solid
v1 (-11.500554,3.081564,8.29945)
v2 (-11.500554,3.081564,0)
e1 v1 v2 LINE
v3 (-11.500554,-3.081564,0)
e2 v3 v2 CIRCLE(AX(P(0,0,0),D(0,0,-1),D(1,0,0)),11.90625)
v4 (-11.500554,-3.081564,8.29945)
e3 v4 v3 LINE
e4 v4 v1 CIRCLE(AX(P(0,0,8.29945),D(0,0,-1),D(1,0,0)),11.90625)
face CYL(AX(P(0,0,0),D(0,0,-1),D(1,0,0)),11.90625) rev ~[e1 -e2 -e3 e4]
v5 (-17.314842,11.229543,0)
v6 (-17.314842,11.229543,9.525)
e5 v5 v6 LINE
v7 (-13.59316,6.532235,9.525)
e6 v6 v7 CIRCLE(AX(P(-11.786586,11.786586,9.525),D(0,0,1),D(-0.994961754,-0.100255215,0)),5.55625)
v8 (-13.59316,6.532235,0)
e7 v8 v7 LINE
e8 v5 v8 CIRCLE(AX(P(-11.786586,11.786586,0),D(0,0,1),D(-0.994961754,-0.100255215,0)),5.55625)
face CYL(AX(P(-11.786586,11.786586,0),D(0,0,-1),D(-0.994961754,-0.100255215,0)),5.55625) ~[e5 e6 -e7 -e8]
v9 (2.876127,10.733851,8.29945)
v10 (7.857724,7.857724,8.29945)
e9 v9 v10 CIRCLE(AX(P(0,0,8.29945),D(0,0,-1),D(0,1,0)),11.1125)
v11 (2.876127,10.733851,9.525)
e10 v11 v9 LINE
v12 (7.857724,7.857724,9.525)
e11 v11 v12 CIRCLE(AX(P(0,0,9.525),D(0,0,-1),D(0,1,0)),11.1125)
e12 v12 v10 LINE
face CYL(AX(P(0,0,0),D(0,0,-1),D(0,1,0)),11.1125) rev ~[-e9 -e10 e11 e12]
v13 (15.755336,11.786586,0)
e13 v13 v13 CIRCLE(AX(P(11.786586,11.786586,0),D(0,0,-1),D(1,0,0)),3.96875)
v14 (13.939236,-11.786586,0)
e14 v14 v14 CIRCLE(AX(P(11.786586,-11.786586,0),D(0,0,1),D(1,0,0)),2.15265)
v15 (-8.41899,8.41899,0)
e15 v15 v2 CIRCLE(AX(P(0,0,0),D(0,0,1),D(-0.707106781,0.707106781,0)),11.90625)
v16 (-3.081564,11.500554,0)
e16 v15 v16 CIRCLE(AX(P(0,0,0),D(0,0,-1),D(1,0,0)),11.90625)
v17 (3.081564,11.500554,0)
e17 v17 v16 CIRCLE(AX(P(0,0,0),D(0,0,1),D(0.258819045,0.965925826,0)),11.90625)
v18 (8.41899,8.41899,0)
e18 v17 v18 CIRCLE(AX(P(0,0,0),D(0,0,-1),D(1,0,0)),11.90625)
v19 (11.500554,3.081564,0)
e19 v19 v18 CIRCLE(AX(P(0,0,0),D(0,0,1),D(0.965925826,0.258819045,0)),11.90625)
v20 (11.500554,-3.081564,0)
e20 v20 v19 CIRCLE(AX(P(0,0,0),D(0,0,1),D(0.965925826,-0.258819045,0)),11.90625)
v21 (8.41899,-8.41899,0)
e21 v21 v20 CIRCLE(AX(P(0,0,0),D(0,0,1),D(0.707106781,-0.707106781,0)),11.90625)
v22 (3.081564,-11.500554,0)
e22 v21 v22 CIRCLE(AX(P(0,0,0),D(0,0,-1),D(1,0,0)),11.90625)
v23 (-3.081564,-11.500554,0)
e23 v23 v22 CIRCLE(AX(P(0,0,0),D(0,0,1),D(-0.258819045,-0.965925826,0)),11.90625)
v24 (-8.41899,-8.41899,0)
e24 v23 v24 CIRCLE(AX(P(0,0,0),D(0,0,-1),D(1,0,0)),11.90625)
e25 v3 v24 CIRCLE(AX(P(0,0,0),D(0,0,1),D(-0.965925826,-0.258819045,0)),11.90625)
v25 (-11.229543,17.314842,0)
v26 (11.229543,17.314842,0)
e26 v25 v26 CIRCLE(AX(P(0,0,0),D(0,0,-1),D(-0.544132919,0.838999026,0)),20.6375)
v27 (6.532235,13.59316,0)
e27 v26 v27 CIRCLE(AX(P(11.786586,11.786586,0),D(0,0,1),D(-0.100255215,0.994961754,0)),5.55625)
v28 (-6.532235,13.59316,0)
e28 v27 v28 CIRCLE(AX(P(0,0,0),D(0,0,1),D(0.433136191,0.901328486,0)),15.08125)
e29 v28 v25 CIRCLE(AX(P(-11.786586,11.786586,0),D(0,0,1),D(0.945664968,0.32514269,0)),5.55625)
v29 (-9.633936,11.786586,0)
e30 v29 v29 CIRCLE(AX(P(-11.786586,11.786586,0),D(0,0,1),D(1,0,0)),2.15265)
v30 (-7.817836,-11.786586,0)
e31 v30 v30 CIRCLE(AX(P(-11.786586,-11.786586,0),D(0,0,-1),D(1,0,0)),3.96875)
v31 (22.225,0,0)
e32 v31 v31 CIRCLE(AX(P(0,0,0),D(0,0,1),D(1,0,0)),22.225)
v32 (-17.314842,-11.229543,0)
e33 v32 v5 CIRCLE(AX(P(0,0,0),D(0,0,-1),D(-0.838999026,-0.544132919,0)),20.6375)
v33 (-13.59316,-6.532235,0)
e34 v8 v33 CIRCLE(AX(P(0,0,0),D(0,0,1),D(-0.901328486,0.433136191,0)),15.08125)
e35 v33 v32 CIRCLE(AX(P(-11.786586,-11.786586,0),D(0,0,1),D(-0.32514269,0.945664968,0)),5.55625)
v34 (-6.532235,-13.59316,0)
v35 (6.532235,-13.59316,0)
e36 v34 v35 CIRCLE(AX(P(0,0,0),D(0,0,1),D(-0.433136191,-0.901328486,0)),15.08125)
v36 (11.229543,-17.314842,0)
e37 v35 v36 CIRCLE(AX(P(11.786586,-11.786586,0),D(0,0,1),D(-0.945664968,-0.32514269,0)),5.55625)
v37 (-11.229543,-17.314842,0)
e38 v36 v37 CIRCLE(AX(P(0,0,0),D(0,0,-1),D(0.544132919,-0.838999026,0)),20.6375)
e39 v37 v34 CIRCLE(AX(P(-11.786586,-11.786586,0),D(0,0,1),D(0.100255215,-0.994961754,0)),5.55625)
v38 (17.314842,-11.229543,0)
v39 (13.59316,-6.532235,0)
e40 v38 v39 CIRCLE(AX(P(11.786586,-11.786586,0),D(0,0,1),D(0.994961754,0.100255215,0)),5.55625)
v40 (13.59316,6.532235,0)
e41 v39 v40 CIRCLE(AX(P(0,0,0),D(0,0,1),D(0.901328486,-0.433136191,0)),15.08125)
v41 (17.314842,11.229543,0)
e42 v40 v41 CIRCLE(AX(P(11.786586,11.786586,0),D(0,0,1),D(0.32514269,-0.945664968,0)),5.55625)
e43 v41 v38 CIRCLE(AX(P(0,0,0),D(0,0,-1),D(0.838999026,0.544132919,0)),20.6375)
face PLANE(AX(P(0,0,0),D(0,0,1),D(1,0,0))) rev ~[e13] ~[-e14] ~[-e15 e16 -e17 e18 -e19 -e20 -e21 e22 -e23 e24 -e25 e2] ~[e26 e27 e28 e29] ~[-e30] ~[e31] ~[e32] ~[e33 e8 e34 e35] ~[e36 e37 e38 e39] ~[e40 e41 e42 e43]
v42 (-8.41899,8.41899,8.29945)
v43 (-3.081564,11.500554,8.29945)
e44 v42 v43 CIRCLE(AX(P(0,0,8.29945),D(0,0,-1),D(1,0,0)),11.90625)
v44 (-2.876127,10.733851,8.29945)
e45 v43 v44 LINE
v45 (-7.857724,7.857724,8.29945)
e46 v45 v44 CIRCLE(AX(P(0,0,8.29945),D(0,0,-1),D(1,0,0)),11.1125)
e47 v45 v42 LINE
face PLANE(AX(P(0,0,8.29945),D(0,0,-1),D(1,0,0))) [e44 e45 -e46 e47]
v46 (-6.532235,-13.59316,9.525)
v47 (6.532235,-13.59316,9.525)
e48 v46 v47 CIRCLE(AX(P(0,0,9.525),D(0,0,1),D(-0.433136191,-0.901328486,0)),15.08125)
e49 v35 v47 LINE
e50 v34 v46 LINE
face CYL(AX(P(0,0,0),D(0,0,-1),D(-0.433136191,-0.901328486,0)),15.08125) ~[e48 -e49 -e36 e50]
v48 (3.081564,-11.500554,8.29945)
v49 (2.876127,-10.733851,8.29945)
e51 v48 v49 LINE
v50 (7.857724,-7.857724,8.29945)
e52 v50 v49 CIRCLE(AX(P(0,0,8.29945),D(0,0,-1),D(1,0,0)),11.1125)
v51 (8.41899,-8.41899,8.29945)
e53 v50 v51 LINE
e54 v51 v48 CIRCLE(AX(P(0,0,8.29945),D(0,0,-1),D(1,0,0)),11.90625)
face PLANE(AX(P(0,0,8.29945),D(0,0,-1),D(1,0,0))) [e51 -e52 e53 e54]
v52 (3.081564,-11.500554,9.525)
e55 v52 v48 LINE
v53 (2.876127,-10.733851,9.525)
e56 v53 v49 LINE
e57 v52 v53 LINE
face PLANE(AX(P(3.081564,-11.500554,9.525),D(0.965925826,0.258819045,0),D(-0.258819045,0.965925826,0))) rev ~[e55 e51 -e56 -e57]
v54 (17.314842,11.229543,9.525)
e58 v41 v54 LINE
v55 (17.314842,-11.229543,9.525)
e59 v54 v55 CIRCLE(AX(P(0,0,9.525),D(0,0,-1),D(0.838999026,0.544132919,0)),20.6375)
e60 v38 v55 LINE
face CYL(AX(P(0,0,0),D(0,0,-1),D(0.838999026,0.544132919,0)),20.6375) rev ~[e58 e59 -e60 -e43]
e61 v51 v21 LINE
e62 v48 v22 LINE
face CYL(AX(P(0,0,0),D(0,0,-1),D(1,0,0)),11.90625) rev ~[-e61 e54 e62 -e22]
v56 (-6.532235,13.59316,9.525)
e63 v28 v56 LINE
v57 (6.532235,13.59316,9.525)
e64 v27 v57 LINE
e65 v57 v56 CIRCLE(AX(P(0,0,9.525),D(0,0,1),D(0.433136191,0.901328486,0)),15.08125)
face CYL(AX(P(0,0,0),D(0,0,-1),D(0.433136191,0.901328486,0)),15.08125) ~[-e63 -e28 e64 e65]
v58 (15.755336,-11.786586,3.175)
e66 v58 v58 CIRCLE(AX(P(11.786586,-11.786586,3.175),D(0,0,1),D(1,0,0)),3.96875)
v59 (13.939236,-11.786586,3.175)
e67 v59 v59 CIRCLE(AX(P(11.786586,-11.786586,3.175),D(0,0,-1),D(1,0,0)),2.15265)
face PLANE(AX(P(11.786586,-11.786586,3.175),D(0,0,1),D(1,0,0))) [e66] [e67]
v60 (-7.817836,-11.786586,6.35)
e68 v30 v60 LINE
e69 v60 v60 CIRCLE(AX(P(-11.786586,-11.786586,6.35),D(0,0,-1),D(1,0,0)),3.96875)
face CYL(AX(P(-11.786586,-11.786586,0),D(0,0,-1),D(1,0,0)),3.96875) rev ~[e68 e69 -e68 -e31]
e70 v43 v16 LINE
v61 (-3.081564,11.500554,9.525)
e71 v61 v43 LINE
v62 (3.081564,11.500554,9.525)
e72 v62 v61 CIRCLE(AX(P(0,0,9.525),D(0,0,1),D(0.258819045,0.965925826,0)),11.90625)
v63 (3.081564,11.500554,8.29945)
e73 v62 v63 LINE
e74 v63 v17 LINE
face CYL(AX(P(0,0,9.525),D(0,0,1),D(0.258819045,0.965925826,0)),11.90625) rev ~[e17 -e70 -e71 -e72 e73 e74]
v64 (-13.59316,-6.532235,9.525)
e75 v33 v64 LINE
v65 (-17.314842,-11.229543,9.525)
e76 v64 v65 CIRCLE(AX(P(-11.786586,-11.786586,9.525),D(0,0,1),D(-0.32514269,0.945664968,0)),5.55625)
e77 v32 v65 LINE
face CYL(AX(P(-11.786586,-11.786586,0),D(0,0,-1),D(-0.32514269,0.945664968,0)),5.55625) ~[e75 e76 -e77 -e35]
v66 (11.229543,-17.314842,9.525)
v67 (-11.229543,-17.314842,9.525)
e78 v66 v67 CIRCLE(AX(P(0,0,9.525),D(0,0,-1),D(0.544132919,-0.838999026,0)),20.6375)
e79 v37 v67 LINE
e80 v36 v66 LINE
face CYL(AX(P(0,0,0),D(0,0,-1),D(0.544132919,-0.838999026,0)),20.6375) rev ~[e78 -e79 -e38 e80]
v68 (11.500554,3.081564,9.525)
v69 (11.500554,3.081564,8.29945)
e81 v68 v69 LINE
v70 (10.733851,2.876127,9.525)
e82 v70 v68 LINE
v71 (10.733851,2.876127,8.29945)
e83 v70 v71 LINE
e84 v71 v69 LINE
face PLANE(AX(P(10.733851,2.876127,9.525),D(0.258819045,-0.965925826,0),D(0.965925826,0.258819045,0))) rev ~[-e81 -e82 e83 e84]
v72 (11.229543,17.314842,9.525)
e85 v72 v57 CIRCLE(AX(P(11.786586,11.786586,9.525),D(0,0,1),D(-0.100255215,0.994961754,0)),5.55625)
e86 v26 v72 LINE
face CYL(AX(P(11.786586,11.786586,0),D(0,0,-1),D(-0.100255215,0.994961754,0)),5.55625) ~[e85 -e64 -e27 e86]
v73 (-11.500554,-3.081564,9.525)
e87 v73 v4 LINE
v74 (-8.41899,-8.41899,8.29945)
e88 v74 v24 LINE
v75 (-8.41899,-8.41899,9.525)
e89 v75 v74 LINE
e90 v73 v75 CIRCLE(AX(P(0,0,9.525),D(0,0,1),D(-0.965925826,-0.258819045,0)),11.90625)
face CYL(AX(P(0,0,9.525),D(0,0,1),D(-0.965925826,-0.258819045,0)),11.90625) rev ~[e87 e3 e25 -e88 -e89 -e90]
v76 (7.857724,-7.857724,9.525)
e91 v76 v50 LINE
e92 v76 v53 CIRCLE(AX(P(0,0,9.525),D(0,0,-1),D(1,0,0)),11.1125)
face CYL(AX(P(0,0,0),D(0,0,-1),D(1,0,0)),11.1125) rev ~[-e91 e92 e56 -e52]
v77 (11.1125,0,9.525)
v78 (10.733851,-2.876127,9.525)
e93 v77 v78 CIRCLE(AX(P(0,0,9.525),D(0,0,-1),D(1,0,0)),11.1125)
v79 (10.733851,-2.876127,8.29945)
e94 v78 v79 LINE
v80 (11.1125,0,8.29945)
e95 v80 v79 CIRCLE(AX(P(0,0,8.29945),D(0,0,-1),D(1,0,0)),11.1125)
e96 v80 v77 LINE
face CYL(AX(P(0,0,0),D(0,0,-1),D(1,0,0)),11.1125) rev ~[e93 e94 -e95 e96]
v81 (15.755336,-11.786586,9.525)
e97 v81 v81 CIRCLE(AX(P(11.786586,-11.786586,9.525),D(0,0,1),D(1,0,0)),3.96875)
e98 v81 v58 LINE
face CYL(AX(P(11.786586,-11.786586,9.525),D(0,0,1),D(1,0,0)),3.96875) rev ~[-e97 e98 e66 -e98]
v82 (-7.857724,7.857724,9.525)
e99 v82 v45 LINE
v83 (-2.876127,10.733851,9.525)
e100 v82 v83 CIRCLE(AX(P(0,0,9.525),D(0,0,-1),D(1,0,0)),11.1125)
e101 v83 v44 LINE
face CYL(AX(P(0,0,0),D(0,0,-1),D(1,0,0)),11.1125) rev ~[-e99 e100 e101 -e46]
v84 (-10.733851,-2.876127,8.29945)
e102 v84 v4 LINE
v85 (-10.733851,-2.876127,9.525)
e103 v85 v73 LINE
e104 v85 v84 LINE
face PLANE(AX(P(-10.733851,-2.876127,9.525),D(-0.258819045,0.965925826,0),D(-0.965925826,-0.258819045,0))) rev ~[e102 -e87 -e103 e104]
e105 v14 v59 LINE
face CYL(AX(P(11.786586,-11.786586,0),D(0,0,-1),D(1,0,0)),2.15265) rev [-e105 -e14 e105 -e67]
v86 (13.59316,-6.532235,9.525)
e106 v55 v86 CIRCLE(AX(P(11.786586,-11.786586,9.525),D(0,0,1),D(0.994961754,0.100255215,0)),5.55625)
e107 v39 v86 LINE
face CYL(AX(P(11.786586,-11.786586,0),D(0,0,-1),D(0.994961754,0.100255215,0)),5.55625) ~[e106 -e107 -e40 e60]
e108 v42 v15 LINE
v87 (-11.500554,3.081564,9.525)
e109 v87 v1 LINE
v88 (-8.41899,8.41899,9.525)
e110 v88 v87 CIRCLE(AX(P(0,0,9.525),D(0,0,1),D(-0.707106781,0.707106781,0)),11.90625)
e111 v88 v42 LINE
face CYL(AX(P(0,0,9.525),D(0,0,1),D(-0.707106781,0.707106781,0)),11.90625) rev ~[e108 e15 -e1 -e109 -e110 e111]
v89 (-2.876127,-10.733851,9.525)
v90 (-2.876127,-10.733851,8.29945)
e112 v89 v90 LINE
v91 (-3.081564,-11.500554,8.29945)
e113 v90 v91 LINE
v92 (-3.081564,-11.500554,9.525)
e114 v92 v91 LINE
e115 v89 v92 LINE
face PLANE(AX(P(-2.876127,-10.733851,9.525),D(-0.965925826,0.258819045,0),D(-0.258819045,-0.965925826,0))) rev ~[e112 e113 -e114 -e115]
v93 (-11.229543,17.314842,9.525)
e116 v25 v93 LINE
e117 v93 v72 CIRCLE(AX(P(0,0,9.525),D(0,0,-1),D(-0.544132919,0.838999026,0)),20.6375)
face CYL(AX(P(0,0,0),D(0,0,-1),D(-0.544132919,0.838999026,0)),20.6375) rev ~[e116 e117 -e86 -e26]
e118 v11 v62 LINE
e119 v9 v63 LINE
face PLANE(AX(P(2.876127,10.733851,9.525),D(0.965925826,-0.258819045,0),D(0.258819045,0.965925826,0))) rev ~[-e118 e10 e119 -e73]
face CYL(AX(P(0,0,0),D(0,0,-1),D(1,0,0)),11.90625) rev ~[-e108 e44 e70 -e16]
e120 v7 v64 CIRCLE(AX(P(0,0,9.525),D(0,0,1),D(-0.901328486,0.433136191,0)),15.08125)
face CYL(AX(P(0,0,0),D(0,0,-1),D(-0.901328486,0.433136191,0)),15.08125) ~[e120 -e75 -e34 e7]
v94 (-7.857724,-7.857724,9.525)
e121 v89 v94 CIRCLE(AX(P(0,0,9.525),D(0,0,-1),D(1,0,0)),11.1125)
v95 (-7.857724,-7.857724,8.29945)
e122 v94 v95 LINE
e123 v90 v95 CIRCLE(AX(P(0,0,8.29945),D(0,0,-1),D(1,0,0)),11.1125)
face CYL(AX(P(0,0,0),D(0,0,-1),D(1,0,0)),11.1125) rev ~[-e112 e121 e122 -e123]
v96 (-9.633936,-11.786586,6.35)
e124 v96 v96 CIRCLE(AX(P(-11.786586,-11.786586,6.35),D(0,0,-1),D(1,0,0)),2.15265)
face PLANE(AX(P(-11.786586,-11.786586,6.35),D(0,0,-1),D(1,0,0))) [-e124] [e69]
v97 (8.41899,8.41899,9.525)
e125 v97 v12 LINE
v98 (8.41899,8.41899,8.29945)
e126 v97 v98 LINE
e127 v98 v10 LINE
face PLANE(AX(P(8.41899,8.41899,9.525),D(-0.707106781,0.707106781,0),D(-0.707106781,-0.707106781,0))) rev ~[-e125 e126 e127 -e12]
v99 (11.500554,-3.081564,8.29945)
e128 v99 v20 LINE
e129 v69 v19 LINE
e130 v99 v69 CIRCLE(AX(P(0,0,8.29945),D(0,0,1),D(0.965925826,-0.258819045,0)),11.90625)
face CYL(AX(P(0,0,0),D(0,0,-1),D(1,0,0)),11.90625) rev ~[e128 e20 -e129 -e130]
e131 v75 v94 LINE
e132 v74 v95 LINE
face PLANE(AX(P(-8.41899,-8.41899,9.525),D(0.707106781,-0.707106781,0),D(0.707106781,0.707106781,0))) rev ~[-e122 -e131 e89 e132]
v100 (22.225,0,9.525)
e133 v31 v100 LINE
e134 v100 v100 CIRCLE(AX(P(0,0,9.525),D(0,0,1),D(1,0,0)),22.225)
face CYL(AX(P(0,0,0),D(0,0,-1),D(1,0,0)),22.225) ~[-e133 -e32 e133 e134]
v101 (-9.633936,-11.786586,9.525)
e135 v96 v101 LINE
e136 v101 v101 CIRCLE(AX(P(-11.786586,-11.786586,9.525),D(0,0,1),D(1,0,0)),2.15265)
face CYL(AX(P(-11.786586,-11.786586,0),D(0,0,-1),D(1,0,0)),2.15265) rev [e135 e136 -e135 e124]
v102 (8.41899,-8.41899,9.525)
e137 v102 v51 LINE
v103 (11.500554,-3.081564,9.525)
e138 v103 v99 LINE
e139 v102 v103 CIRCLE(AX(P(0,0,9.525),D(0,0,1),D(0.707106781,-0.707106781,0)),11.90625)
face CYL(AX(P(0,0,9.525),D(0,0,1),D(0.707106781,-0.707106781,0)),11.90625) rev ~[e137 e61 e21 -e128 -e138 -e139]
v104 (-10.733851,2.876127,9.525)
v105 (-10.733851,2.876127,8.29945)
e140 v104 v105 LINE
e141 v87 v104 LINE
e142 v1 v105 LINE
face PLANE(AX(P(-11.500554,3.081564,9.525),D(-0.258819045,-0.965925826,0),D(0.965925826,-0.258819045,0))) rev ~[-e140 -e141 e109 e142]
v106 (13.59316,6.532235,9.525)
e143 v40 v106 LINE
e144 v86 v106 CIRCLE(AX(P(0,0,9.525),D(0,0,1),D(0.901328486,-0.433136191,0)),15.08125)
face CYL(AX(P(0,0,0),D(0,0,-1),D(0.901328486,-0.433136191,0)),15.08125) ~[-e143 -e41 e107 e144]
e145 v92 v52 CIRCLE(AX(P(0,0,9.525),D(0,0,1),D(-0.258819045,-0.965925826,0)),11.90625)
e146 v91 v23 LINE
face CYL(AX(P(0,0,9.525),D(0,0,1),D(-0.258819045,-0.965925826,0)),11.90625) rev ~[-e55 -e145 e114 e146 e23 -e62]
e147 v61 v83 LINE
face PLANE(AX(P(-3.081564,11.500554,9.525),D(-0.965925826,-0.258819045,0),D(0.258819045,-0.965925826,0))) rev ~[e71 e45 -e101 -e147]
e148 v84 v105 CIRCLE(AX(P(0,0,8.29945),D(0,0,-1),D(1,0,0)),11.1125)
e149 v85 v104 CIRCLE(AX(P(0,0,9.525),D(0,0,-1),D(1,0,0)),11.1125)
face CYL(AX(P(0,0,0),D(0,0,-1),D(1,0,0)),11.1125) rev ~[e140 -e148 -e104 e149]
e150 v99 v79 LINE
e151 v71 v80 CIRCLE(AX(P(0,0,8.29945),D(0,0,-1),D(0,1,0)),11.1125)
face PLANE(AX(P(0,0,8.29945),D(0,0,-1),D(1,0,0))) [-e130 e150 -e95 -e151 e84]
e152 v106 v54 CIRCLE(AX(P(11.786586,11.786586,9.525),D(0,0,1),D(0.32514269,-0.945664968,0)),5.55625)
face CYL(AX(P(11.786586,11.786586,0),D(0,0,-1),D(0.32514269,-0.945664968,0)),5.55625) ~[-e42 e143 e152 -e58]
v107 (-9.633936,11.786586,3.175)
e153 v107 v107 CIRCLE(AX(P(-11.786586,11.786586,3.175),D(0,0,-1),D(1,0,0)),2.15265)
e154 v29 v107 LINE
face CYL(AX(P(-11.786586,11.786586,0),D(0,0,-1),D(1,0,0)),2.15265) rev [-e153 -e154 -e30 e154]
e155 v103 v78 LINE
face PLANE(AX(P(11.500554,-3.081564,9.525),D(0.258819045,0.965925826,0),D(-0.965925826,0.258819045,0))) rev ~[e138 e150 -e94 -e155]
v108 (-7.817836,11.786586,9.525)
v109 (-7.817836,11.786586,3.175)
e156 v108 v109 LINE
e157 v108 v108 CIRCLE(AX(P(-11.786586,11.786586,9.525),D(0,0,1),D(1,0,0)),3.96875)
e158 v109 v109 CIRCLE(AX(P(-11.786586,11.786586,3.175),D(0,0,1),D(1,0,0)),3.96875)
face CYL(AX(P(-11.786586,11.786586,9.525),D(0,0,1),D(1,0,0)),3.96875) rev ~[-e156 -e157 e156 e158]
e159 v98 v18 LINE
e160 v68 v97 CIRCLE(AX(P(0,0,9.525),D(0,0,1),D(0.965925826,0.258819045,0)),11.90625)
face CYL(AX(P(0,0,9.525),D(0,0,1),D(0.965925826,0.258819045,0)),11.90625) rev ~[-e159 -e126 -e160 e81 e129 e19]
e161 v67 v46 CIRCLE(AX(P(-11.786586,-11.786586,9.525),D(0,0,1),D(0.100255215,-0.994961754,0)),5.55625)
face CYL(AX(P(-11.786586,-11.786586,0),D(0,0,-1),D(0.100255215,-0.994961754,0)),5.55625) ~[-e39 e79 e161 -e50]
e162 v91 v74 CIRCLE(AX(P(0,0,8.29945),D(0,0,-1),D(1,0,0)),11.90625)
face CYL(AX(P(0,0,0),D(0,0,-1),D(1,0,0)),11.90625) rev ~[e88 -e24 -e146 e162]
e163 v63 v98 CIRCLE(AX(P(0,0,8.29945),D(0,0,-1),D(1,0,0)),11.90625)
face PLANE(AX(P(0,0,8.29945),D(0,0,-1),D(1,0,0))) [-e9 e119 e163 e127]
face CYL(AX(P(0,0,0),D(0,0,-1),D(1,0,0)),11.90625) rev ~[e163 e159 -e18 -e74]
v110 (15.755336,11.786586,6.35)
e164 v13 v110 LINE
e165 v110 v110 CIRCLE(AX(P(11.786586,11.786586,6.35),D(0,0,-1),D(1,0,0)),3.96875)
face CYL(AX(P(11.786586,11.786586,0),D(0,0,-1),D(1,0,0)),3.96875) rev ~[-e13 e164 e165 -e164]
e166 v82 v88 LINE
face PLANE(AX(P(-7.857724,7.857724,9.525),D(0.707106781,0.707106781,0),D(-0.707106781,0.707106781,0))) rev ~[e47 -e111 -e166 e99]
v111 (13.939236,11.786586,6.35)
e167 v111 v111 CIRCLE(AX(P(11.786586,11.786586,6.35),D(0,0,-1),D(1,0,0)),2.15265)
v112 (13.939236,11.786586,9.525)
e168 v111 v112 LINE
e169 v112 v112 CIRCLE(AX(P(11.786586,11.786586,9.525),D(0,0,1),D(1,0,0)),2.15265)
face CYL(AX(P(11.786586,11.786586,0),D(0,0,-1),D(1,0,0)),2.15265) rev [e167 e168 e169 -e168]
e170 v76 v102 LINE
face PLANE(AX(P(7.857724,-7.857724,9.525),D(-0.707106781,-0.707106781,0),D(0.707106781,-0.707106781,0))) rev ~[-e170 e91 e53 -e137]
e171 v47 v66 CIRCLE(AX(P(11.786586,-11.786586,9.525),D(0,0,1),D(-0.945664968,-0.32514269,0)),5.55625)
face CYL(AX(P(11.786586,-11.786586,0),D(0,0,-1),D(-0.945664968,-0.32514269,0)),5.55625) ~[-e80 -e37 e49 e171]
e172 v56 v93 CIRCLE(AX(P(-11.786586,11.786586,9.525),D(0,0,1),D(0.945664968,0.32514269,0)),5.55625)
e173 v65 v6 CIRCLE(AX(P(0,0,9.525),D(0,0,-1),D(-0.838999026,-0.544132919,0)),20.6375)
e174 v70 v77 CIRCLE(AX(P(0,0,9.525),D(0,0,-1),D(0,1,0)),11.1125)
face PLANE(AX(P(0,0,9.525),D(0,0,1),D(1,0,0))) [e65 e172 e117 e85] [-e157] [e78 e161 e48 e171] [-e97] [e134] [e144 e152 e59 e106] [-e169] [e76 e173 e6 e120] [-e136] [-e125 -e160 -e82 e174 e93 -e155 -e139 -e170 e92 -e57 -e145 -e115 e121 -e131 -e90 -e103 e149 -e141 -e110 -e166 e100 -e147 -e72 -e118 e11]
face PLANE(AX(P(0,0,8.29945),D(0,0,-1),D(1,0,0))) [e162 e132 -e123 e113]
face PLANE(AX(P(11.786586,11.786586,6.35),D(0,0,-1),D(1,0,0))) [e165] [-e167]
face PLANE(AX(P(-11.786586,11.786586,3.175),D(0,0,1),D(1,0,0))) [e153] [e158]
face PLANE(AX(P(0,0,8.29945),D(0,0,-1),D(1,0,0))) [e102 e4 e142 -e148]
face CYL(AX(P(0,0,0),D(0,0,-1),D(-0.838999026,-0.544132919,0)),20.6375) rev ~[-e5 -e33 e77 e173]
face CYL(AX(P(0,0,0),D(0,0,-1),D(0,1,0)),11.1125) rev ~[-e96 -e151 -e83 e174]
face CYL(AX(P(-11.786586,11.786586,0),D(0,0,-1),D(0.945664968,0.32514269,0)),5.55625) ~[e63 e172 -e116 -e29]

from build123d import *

# Parameters (mm, degrees)
F0_R             = 22.225
F0_R_2           = 2.15265
F1_DEPTH         = 9.525
F3_DEPTH         = 9.525
F4_COUNT         = 6
F4_ANGLE         = 300
F6_R             = 11.90625
F7_DEPTH         = 8.29945
F10_R            = 3.96875
F11_DEPTH        = 6.35
F12_R            = 3.96875
F13_DEPTH        = 6.35
F15_DEPTH        = 9.525
F15_COPIES_COUNT = 4


# Not quite as in the source:
# - a pattern or mirror of a feature is missing from the dataset's text; its kind, count and spacing are read off the source's solid


with BuildPart() as f1:
    # F0 (on Top) → F1 (new body)
    with BuildSketch(Plane.XY):
        Circle(F0_R)
        with Locations((-11.7865861589, -11.7865861589)):
            Circle(F0_R_2, mode=Mode.SUBTRACT)
        with Locations((11.7865861589, -11.7865861589)):
            Circle(F0_R_2, mode=Mode.SUBTRACT)
        with Locations((-11.7865861589, 11.7865861589)):
            Circle(F0_R_2, mode=Mode.SUBTRACT)
        with BuildLine():
            ThreePointArc((0, 11.1125), (7.8577241059, 7.8577241059), (11.1125, 0))
            ThreePointArc((11.1125, 0), (-7.8577241059, -7.8577241059), (0, 11.1125))
        make_face(mode=Mode.SUBTRACT)
        with Locations((11.7865861589, 11.7865861589)):
            Circle(F0_R_2, mode=Mode.SUBTRACT)
    extrude(amount=F1_DEPTH)

    # F2 (on face) → F3 (cut, through all)
    with BuildSketch(Plane.XY.offset(9.525)):
        with BuildLine():
            ThreePointArc((-2.8761266387, 10.7338507446), (0, 11.1125), (2.8761266387, 10.7338507446))
            Line((2.8761266387, 10.7338507446), (3.0815642558, 11.5005543693))
            ThreePointArc((3.0815642558, 11.5005543693), (0, 11.90625), (-3.0815642558, 11.5005543693))
            Line((-3.0815642558, 11.5005543693), (-2.8761266387, 10.7338507446))
        make_face()
    f3 = extrude(amount=-F3_DEPTH, mode=Mode.SUBTRACT)

    # F4: F3 ×6 about axis
    f4_axis = Axis((0, 0, 0), (0, 0, -1))
    for i in range(1, F4_COUNT):
        add(f3.rotate(f4_axis, i * F4_ANGLE / (F4_COUNT - 1)), mode=Mode.SUBTRACT)

    # F6 (on face) → F7 (cut, through all)
    with BuildSketch(Plane(origin=(0, 0, 0), x_dir=(1, 0, 0), z_dir=(0, 0, -1))):
        Circle(F6_R)
    extrude(amount=-F7_DEPTH, mode=Mode.SUBTRACT)

    # F10 (on face) → F11 (cut, through all)
    with BuildSketch(Plane(origin=(0, 0, 0), x_dir=(1, 0, 0), z_dir=(0, 0, -1))):
        with Locations((11.7865861589, -11.7865861589)):
            Circle(F10_R)
        with Locations((-11.7865861589, 11.7865861589)):
            Circle(F10_R)
    extrude(amount=-F11_DEPTH, mode=Mode.SUBTRACT)

    # F12 (on face) → F13 (cut, through all)
    with BuildSketch(Plane.XY.offset(9.525)):
        with Locations((-11.7865861589, 11.7865861589)):
            Circle(F12_R)
        with Locations((11.7865861589, -11.7865861589)):
            Circle(F12_R)
    extrude(amount=-F13_DEPTH, mode=Mode.SUBTRACT)

    # F14 (on face) → F15 (cut, through all)
    with BuildSketch(Plane(origin=(0, 0, 0), x_dir=(1, 0, 0), z_dir=(0, 0, -1))):
        with BuildLine():
            ThreePointArc((-11.229543123, 17.3148424047), (-8.3361072587, 16.1415958514), (-6.5322351826, 13.5931602316))
            ThreePointArc((-6.5322351826, 13.5931602316), (0, 15.08125), (6.5322351826, 13.5931602316))
            ThreePointArc((6.5322351826, 13.5931602316), (8.3361072587, 16.1415958514), (11.229543123, 17.3148424047))
            ThreePointArc((11.229543123, 17.3148424047), (0, 20.6375), (-11.229543123, 17.3148424047))
        make_face()
    f15 = extrude(amount=-F15_DEPTH, mode=Mode.SUBTRACT)

    # F15_copies: F15 ×4 about axis
    f15_copies_axis = Axis((0, 0, 0), (0, 0, 1))
    for i in range(1, F15_COPIES_COUNT):
        add(f15.rotate(f15_copies_axis, i * 360 / F15_COPIES_COUNT), mode=Mode.SUBTRACT)


solid = f1.part
